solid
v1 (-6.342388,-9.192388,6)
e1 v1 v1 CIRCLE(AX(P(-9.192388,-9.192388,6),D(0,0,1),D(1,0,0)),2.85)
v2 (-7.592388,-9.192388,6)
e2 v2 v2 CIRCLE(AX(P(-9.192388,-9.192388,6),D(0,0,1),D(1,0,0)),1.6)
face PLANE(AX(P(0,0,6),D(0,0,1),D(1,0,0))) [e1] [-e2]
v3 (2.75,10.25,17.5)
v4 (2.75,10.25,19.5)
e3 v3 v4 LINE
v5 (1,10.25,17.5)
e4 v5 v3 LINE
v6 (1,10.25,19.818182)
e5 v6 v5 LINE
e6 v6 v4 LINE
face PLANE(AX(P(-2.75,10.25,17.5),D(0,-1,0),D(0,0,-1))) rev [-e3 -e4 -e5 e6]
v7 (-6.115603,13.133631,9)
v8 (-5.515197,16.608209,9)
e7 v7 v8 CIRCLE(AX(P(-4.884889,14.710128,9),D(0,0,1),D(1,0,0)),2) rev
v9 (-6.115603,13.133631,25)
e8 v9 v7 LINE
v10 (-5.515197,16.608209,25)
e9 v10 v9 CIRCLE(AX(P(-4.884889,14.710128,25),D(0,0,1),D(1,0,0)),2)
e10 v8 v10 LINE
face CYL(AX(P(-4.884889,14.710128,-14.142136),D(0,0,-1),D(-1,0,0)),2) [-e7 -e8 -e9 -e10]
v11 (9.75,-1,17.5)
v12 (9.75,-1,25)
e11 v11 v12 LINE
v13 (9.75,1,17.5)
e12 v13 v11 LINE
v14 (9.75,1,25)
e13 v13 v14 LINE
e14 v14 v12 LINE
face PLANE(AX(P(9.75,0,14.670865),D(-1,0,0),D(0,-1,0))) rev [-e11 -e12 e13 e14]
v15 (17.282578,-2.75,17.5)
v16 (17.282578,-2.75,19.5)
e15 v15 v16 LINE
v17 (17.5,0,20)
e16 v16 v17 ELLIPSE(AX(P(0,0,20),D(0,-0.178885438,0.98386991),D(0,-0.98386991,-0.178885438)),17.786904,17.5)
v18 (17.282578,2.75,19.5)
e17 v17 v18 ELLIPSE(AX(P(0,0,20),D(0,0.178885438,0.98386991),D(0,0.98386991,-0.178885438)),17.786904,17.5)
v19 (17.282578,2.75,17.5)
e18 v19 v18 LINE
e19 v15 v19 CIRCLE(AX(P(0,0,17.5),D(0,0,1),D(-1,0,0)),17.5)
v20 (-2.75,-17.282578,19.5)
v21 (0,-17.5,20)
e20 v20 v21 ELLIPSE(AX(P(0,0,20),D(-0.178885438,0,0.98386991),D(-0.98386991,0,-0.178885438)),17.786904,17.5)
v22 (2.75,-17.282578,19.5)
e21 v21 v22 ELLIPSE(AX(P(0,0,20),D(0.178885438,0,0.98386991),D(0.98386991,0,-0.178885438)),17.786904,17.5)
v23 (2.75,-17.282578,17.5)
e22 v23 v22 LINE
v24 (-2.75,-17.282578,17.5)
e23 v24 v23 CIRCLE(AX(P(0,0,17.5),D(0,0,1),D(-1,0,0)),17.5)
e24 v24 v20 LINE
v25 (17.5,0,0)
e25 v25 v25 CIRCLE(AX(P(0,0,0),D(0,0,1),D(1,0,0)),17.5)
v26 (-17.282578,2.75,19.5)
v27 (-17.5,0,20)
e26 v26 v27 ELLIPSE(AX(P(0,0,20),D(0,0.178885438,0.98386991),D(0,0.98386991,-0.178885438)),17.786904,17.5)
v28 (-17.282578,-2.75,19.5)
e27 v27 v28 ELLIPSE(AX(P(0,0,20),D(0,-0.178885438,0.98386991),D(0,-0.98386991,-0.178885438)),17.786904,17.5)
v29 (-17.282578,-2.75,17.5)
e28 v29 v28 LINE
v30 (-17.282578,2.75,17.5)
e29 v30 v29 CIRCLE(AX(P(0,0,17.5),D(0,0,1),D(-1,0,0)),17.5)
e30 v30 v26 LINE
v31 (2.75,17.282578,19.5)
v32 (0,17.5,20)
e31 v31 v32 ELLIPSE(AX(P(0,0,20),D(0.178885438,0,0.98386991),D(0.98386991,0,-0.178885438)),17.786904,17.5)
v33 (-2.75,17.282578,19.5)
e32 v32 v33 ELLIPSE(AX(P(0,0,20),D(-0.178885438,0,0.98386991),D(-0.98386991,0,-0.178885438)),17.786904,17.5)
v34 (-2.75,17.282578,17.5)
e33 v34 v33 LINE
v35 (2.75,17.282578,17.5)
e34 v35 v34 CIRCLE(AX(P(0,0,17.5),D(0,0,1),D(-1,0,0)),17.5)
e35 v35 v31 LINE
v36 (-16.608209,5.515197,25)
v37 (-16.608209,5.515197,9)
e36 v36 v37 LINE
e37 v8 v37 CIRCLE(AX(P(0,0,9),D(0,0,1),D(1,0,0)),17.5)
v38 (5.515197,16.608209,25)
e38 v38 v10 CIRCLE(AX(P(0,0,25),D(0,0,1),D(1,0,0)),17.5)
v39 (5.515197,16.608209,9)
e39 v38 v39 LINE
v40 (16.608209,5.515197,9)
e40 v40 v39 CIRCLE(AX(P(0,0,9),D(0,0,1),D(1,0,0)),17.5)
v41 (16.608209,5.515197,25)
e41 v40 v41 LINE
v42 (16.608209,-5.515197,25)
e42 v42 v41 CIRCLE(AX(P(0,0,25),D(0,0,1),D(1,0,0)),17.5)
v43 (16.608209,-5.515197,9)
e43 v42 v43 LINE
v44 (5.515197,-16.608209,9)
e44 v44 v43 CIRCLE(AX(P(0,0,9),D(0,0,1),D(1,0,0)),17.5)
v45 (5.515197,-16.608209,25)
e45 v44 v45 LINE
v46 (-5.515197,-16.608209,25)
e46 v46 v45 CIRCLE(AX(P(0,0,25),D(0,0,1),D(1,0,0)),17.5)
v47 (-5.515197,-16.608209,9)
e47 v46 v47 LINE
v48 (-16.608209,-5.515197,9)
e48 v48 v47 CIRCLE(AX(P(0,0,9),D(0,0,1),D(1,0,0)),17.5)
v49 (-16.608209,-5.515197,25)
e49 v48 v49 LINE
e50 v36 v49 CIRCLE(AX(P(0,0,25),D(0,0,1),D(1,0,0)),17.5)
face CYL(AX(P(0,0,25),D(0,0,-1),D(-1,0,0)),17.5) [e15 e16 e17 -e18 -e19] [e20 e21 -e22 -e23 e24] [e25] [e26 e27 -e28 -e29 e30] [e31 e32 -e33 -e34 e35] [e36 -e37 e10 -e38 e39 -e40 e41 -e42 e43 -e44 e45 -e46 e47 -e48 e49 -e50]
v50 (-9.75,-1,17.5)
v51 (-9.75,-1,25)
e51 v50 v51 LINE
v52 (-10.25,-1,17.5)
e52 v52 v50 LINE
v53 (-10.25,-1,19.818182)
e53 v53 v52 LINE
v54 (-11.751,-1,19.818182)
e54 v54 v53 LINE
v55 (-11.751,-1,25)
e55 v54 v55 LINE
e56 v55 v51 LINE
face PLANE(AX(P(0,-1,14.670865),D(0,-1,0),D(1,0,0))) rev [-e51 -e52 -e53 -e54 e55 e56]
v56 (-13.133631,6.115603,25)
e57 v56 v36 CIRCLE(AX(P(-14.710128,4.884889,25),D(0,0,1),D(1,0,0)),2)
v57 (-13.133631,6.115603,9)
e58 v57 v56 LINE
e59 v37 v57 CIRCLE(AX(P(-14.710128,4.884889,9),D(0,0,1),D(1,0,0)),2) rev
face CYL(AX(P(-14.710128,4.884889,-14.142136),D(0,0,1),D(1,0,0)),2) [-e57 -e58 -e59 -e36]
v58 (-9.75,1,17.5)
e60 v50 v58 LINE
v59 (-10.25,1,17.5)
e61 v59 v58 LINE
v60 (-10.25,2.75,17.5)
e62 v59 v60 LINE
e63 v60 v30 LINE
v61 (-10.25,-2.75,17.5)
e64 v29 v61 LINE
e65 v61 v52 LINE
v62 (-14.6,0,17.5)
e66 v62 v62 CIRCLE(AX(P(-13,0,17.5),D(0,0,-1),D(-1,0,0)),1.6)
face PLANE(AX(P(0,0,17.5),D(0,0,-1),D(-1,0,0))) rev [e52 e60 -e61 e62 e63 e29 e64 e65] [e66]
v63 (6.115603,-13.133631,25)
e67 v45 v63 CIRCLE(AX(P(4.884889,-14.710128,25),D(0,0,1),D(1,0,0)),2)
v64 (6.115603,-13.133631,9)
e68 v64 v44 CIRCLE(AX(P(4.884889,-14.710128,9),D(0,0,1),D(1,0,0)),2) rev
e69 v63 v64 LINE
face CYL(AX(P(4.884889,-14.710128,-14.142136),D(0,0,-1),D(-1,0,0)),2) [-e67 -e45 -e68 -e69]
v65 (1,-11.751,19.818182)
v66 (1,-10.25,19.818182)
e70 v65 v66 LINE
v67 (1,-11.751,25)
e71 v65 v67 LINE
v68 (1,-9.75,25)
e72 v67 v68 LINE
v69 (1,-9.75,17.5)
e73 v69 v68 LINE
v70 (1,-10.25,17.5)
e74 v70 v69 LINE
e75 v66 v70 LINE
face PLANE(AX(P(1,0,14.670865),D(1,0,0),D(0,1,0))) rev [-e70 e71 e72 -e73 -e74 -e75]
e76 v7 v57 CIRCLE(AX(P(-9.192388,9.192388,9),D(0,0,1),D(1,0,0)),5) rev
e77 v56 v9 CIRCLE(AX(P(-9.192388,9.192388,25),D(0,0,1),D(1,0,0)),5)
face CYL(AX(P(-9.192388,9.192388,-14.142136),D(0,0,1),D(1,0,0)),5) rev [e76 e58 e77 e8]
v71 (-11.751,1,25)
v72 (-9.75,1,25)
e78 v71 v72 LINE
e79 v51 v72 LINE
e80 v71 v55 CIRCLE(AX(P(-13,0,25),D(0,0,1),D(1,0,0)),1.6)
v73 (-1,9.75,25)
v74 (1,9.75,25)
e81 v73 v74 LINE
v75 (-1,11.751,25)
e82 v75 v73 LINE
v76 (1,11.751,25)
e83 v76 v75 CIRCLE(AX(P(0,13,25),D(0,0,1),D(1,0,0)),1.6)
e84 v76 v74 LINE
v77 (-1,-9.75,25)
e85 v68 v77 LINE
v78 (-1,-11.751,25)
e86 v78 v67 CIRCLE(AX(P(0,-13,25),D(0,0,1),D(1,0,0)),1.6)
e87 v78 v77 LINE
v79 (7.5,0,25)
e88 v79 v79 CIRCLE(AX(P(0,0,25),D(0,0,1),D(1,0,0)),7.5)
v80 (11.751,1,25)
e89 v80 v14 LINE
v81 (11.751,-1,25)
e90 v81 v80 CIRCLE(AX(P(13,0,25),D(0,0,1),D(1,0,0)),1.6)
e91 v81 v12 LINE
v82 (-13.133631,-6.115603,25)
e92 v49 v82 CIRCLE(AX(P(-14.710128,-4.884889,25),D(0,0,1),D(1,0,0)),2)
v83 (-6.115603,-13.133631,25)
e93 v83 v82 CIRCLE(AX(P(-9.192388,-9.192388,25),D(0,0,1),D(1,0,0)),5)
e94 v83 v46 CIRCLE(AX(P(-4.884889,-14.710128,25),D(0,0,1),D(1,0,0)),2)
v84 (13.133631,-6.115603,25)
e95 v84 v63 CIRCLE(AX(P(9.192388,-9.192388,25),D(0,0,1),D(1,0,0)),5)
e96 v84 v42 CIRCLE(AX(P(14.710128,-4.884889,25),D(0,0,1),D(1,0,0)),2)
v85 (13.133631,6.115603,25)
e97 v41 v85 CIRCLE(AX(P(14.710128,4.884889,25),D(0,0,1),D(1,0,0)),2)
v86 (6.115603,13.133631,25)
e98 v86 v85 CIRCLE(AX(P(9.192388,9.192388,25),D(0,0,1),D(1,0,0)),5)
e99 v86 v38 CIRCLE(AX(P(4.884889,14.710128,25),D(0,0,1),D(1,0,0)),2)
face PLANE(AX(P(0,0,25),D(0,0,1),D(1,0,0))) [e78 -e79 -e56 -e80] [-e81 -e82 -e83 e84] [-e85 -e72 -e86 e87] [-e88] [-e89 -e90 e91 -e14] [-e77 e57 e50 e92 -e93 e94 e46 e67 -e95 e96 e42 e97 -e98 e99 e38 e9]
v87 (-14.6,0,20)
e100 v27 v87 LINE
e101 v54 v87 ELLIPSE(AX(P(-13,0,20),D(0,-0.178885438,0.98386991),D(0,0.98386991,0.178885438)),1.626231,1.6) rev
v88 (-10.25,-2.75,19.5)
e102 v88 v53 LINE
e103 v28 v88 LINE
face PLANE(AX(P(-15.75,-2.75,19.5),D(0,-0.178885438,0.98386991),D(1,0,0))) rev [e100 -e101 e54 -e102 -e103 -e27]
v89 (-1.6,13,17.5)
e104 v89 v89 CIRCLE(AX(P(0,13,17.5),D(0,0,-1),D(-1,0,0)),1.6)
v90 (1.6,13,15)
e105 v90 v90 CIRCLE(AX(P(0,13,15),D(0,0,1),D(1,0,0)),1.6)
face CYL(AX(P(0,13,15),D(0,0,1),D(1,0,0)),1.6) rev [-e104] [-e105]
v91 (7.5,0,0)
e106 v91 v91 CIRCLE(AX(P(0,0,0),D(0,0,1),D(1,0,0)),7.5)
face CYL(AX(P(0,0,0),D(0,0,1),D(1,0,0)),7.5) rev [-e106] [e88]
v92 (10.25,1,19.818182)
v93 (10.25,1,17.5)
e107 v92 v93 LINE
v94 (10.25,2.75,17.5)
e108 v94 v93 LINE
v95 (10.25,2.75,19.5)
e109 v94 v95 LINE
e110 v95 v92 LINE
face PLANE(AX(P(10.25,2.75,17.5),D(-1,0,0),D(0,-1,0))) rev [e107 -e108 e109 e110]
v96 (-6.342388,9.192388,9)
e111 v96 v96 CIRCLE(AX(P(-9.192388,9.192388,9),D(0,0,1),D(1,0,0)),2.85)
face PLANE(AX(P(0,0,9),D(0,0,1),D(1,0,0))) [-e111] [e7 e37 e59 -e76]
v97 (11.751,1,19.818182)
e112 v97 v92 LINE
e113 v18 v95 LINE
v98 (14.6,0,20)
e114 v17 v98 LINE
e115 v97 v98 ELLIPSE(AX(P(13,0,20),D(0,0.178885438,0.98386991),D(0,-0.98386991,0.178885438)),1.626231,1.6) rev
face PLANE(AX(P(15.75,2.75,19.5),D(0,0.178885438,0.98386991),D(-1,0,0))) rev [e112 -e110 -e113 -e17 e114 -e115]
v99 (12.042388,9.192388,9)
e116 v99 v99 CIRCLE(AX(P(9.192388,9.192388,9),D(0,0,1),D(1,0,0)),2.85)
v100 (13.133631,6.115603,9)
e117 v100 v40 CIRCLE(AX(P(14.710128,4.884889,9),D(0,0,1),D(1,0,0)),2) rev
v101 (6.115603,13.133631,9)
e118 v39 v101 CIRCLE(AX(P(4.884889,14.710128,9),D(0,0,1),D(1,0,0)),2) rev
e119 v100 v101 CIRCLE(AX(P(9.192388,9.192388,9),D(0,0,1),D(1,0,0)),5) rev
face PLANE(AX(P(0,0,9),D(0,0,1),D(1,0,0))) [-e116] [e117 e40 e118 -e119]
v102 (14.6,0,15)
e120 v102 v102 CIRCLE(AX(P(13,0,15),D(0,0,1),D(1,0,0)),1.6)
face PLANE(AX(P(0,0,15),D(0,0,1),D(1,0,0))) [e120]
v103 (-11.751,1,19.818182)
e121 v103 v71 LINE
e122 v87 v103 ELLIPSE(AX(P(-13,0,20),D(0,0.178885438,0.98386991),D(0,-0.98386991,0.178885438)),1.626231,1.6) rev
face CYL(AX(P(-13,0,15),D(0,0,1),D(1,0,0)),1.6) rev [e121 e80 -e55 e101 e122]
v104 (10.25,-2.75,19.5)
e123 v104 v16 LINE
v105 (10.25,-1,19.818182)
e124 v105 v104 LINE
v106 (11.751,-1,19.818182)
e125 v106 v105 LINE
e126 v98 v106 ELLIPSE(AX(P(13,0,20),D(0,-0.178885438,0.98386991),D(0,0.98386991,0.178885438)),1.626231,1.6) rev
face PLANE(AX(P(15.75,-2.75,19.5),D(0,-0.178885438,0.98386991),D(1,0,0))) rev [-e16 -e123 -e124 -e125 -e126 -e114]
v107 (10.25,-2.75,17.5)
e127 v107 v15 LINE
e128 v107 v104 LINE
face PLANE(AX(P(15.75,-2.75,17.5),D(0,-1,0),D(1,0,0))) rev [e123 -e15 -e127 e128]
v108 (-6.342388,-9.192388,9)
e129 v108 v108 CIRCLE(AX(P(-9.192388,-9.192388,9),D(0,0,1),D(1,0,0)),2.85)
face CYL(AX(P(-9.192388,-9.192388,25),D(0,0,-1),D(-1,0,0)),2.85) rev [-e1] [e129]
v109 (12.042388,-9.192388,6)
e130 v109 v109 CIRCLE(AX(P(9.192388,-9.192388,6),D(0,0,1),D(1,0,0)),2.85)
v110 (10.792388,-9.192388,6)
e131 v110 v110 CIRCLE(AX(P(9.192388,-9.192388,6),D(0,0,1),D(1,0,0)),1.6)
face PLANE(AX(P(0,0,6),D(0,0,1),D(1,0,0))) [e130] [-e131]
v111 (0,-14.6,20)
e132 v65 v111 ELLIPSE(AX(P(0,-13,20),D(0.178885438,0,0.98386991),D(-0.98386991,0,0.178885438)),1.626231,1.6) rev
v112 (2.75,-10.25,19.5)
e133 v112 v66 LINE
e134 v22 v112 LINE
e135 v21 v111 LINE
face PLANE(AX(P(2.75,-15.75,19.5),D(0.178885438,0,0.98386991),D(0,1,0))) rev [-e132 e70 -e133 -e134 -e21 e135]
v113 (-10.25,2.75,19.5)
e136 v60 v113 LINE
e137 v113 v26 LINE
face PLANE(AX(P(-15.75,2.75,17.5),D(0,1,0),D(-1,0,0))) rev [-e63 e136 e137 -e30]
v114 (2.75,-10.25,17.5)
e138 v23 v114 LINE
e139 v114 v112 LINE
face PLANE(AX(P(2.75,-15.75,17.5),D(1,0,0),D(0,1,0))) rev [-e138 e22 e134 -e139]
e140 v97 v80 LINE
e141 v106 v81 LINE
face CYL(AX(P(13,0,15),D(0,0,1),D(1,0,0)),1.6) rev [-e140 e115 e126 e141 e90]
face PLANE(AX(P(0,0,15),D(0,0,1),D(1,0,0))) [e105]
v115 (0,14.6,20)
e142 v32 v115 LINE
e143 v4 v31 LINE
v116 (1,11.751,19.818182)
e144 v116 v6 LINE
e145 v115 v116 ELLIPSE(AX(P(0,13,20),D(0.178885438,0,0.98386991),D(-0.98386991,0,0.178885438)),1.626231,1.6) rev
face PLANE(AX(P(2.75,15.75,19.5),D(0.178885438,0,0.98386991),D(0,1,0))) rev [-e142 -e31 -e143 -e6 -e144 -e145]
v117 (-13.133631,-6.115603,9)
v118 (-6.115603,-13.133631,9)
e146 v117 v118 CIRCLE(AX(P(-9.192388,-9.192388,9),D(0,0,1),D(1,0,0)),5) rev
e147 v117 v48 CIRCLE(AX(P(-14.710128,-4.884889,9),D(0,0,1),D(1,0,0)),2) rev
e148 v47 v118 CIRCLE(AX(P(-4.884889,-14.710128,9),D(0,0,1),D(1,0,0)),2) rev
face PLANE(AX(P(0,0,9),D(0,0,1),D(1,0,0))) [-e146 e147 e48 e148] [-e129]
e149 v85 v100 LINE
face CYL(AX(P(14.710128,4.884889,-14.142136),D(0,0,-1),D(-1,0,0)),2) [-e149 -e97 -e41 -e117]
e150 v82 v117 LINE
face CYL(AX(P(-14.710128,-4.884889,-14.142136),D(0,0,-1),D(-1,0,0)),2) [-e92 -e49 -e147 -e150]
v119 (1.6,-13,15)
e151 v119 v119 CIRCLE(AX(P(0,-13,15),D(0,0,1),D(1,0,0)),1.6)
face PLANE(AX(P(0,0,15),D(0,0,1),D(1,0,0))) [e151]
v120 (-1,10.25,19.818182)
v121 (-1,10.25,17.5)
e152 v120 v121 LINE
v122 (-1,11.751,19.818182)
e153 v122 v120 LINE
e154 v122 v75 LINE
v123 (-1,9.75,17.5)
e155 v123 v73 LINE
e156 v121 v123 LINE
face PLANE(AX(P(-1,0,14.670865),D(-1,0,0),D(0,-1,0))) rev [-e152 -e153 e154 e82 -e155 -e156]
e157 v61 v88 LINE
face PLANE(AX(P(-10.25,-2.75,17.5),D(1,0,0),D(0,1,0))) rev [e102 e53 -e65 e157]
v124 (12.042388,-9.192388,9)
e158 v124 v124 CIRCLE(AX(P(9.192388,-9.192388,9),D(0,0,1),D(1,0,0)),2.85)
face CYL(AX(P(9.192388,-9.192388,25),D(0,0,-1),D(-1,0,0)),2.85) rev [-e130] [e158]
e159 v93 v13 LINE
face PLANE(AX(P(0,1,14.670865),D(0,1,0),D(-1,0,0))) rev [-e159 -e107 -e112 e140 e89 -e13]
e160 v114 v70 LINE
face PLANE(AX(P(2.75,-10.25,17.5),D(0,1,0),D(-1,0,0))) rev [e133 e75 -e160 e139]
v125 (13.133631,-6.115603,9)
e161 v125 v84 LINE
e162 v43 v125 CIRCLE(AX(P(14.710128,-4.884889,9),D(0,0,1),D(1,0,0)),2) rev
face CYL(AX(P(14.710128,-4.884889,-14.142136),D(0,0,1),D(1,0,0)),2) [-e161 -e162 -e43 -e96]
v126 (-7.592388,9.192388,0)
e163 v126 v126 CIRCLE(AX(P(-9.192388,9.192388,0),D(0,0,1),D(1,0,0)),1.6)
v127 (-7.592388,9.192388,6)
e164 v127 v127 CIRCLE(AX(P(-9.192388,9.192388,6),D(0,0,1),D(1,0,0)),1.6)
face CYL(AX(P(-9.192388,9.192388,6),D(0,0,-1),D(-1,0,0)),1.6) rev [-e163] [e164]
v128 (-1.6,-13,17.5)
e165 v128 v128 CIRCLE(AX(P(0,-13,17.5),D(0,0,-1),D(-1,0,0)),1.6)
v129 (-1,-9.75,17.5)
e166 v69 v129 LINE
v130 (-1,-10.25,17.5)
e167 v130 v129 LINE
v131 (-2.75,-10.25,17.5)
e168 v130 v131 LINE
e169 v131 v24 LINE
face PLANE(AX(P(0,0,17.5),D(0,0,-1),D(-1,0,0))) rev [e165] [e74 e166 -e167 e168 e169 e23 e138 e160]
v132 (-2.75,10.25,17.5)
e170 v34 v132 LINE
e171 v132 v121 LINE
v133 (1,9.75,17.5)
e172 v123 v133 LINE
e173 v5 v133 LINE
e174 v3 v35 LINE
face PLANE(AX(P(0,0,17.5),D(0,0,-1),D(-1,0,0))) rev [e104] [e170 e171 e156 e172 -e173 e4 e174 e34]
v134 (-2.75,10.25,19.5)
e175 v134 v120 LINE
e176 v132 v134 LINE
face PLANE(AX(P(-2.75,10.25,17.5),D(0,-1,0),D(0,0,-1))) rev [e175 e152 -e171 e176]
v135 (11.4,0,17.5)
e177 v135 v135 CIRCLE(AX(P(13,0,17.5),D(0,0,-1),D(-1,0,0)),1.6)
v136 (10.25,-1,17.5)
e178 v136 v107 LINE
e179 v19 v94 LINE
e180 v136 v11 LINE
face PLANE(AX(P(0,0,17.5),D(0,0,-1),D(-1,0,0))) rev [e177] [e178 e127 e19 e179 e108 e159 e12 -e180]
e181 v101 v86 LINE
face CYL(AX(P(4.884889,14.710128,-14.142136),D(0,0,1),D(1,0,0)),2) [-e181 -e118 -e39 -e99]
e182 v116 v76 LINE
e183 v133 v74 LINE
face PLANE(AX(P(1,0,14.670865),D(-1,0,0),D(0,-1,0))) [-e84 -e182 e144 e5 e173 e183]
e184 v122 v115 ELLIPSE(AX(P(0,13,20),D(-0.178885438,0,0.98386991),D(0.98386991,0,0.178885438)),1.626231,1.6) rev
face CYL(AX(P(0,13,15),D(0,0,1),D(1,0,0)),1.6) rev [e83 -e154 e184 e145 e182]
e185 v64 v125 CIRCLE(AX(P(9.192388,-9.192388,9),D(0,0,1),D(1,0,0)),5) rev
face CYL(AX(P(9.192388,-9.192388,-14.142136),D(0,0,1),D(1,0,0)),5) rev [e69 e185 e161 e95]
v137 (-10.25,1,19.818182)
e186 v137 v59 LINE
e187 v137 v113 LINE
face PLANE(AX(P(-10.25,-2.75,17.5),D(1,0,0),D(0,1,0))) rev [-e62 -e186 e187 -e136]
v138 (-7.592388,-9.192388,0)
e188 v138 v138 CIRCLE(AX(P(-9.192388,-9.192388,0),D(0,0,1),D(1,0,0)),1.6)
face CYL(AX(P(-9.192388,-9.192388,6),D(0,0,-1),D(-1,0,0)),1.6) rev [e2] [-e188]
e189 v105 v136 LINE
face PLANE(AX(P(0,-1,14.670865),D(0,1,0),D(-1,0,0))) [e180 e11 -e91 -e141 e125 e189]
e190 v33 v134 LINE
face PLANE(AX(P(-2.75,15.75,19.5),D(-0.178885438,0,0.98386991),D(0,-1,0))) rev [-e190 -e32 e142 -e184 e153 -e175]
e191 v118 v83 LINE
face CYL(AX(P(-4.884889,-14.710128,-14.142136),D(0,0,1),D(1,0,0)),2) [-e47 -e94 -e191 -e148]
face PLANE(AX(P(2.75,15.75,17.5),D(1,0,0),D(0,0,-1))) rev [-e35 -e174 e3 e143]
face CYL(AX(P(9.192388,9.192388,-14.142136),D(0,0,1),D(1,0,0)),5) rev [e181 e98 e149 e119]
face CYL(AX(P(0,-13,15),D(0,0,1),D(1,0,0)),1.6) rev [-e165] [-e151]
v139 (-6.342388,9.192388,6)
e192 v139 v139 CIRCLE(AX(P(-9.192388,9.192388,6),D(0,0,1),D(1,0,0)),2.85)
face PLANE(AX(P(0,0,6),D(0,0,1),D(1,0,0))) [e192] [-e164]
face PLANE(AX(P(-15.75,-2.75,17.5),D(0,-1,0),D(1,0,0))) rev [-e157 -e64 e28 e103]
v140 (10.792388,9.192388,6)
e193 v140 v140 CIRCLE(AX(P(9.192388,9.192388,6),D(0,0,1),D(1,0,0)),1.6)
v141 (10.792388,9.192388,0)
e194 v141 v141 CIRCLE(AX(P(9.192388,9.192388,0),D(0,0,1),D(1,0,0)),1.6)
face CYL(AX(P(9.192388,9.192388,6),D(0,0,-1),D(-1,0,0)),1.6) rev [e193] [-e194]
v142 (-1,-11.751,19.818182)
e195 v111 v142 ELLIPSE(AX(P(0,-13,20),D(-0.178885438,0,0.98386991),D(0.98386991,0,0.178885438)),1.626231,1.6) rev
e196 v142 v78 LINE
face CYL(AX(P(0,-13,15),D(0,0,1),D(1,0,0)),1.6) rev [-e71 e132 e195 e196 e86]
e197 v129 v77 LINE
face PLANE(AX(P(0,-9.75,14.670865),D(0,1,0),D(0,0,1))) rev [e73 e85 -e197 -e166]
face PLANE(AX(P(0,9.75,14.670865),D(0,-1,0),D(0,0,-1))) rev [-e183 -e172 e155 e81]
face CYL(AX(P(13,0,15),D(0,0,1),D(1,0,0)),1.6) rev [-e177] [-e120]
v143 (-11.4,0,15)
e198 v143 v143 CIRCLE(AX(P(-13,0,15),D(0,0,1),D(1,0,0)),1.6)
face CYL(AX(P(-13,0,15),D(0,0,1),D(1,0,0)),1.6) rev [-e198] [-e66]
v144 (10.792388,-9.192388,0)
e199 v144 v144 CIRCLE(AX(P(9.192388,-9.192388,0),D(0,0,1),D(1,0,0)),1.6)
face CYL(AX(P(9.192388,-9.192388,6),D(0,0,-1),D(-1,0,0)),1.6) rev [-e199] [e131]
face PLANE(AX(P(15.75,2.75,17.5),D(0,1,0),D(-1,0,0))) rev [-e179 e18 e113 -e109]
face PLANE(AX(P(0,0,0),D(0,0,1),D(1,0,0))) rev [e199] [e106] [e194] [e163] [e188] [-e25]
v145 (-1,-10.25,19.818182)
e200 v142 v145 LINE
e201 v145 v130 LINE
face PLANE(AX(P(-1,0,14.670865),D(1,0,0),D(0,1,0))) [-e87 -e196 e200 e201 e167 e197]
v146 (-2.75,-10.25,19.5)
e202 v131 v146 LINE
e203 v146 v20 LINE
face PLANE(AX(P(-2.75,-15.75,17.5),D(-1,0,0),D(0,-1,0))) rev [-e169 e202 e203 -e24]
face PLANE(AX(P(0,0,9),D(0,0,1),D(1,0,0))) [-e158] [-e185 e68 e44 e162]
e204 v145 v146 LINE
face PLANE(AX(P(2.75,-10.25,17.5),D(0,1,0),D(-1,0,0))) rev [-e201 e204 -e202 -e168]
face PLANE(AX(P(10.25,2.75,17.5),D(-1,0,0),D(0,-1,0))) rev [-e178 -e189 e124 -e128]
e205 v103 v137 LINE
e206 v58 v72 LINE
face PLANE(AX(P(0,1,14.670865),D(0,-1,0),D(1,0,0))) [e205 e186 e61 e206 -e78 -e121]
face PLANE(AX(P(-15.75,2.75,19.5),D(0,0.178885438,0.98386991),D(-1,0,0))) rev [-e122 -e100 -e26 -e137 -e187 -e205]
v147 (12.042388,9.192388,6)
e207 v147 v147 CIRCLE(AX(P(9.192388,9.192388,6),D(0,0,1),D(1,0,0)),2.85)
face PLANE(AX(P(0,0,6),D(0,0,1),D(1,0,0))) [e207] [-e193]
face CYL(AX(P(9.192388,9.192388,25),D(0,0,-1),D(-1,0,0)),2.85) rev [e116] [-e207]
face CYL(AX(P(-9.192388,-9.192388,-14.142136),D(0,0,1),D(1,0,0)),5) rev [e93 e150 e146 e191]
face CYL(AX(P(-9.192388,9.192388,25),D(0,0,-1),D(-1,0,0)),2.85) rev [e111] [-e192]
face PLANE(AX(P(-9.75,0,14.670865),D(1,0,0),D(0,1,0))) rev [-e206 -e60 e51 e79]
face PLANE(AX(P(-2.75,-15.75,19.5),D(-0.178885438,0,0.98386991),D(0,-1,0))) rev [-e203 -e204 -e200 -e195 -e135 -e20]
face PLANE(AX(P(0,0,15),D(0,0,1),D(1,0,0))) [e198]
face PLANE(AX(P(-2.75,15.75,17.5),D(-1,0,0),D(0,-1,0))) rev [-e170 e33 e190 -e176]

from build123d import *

# Parameters (mm, degrees)
SKETCH1_R           = 17.5
SKETCH1_R_2         = 2.85
BOSS_EXTRUDE1_DEPTH = 25
SKETCH1_3_R         = 2.85
SKETCH1_3_R_2       = 1.6
BOSS_EXTRUDE2_DEPTH = 6
SKETCH2_R           = 5
CUT_EXTRUDE1_DEPTH  = 16
FILLET1_R           = 2
CUT_EXTRUDE2_START  = -7.5
SKETCH3_R           = 1.6
CUT_EXTRUDE2_DEPTH  = 2.5
CUT_EXTRUDE3_START  = -10
SKETCH3_2_R         = 1.6
CUT_EXTRUDE3_DEPTH  = 10
CHAMFER1_SIZE       = 2.75
CHAMFER1_SIZE_2     = 0.5
SKETCH4_R           = 7.5
CUT_EXTRUDE4_DEPTH  = 36.178118369
CUT_EXTRUDE5_REACH  = 37.178
SKETCH5_W           = 2
SKETCH5_H           = 0.5
CIRPATTERN1_COUNT   = 4


with BuildPart() as part:
    # Sketch1 → Boss-Extrude1 (new body)
    with BuildSketch(Plane(origin=(0, 0, 0), x_dir=(0, 1, 0), z_dir=(0, 0, 1))):
        with Locations(Location((0, 0, 0), (0, 0, 270))):
            Circle(SKETCH1_R)
        with Locations(Location((-9.192388155, 9.192388155, 0), (0, 0, 270))):
            Circle(SKETCH1_R_2, mode=Mode.SUBTRACT)
        with Locations(Location((-9.192388155, -9.192388155, 0), (0, 0, 270))):
            Circle(SKETCH1_R_2, mode=Mode.SUBTRACT)
        with Locations(Location((9.192388155, -9.192388155, 0), (0, 0, 270))):
            Circle(SKETCH1_R_2, mode=Mode.SUBTRACT)
        with Locations(Location((9.192388155, 9.192388155, 0), (0, 0, 270))):
            Circle(SKETCH1_R_2, mode=Mode.SUBTRACT)
    extrude(amount=BOSS_EXTRUDE1_DEPTH)

    # Sketch1<3> → Boss-Extrude2 (add)
    # profile 1 of 4: a face of its own
    with BuildSketch(Plane(origin=(0, 0, 0), x_dir=(0, 1, 0), z_dir=(0, 0, 1))):
        with Locations(Location((-9.192388155, -9.192388155, 0), (0, 0, 270))):
            Circle(SKETCH1_3_R)
        with Locations(Location((-9.192388155, -9.192388155, 0), (0, 0, 270))):
            Circle(SKETCH1_3_R_2, mode=Mode.SUBTRACT)
    # profile 2 of 4: a face of its own
    with BuildSketch(Plane(origin=(0, 0, 0), x_dir=(0, 1, 0), z_dir=(0, 0, 1))):
        with Locations(Location((-9.192388155, 9.192388155, 0), (0, 0, 270))):
            Circle(SKETCH1_3_R)
        with Locations(Location((-9.192388155, 9.192388155, 0), (0, 0, 270))):
            Circle(SKETCH1_3_R_2, mode=Mode.SUBTRACT)
    # profile 3 of 4: a face of its own
    with BuildSketch(Plane(origin=(0, 0, 0), x_dir=(0, 1, 0), z_dir=(0, 0, 1))):
        with Locations(Location((9.192388155, -9.192388155, 0), (0, 0, 270))):
            Circle(SKETCH1_3_R)
        with Locations(Location((9.192388155, -9.192388155, 0), (0, 0, 270))):
            Circle(SKETCH1_3_R_2, mode=Mode.SUBTRACT)
    # profile 4 of 4: a face of its own
    with BuildSketch(Plane(origin=(0, 0, 0), x_dir=(0, 1, 0), z_dir=(0, 0, 1))):
        with Locations(Location((9.192388155, 9.192388155, 0), (0, 0, 270))):
            Circle(SKETCH1_3_R)
        with Locations(Location((9.192388155, 9.192388155, 0), (0, 0, 270))):
            Circle(SKETCH1_3_R_2, mode=Mode.SUBTRACT)
    extrude(amount=BOSS_EXTRUDE2_DEPTH)

    # Sketch2 → Cut-Extrude1 (cut)
    with BuildSketch(Plane.XY.offset(25)):
        with Locations((-9.192388155, 9.192388155)):
            Circle(SKETCH2_R)
        with Locations((9.192388155, 9.192388155)):
            Circle(SKETCH2_R)
        with Locations((9.192388155, -9.192388155)):
            Circle(SKETCH2_R)
        with Locations((-9.192388155, -9.192388155)):
            Circle(SKETCH2_R)
    extrude(amount=-CUT_EXTRUDE1_DEPTH, mode=Mode.SUBTRACT)

    # Fillet1
    fillet1_edges = [part.edges().sort_by_distance(p)[0] for p in [
        (-14.028560913, -10.46181049, 17),
        (-10.46181049, -14.028560913, 17),
        (10.46181049, -14.028560913, 17),
        (14.028560913, -10.46181049, 17),
        (14.028560913, 10.46181049, 17),
        (10.46181049, 14.028560913, 17),
        (-10.46181049, 14.028560913, 17),
        (-14.028560913, 10.46181049, 17),
    ]]
    fillet(fillet1_edges, radius=FILLET1_R)

    # Sketch3 → Cut-Extrude2 (cut)
    # profile 1 of 4: a face of its own
    with BuildSketch(Plane.XY.offset(25).offset(CUT_EXTRUDE2_START)):
        with BuildLine():
            Line((-2.75, 15.75), (-2.75, 17.282577933))
            ThreePointArc((-2.75, 17.282577933), (0, 17.5), (2.75, 17.282577933))
            Line((2.75, 17.282577933), (2.75, 15.75))
            Line((2.75, 15.75), (2.75, 10.25))
            Line((2.75, 10.25), (-2.75, 10.25))
            Line((-2.75, 10.25), (-2.75, 15.75))
        make_face()
        with Locations((0, 13)):
            Circle(SKETCH3_R, mode=Mode.SUBTRACT)
    # profile 2 of 4: a face of its own
    with BuildSketch(Plane.XY.offset(25).offset(CUT_EXTRUDE2_START)):
        with BuildLine():
            Line((15.75, -2.75), (10.25, -2.75))
            Line((10.25, -2.75), (10.25, 2.75))
            Line((10.25, 2.75), (15.75, 2.75))
            Line((15.75, 2.75), (17.282577933, 2.75))
            ThreePointArc((17.282577933, 2.75), (17.5, 0), (17.282577933, -2.75))
            Line((17.282577933, -2.75), (15.75, -2.75))
        make_face()
        with Locations((13, 0)):
            Circle(SKETCH3_R, mode=Mode.SUBTRACT)
    # profile 3 of 4: a face of its own
    with BuildSketch(Plane.XY.offset(25).offset(CUT_EXTRUDE2_START)):
        with BuildLine():
            Line((-2.75, -15.75), (-2.75, -10.25))
            Line((-2.75, -10.25), (2.75, -10.25))
            Line((2.75, -10.25), (2.75, -15.75))
            Line((2.75, -15.75), (2.75, -17.282577933))
            ThreePointArc((2.75, -17.282577933), (0, -17.5), (-2.75, -17.282577933))
            Line((-2.75, -17.282577933), (-2.75, -15.75))
        make_face()
        with Locations((0, -13)):
            Circle(SKETCH3_R, mode=Mode.SUBTRACT)
    # profile 4 of 4: a face of its own
    with BuildSketch(Plane.XY.offset(25).offset(CUT_EXTRUDE2_START)):
        with BuildLine():
            Line((-15.75, 2.75), (-10.25, 2.75))
            Line((-10.25, 2.75), (-10.25, -2.75))
            Line((-10.25, -2.75), (-15.75, -2.75))
            Line((-15.75, -2.75), (-17.282577933, -2.75))
            ThreePointArc((-17.282577933, -2.75), (-17.5, 0), (-17.282577933, 2.75))
            Line((-17.282577933, 2.75), (-15.75, 2.75))
        make_face()
        with Locations((-13, 0)):
            Circle(SKETCH3_R, mode=Mode.SUBTRACT)
    extrude(amount=CUT_EXTRUDE2_DEPTH, mode=Mode.SUBTRACT)

    # Sketch3<2> → Cut-Extrude3 (cut)
    with BuildSketch(Plane.XY.offset(25).offset(CUT_EXTRUDE3_START)):
        with Locations((-13, 0)):
            Circle(SKETCH3_2_R)
        with Locations((0, 13)):
            Circle(SKETCH3_2_R)
        with Locations((13, 0)):
            Circle(SKETCH3_2_R)
        with Locations((0, -13)):
            Circle(SKETCH3_2_R)
    extrude(amount=CUT_EXTRUDE3_DEPTH, mode=Mode.SUBTRACT)

    # Chamfer1
    # the kernel refuses this chamfer: 2.75, 0.5 mm, written as the material it adds along each edge
    with BuildSketch(Plane(origin=(-3.104266441, -2.75, 20), x_dir=(1.0355932807417332e-14, 0.9999763028084744, 0.006884317068104265), z_dir=(-1, 0, 0))) as chamfer1_piece_1_section:
        Polygon((CHAMFER1_SIZE * 0.999976302808, CHAMFER1_SIZE * 0.0068843170681), (-CHAMFER1_SIZE_2 * 0.0068843170681, CHAMFER1_SIZE_2 * 0.999976302808), (0, 0), align=None)
    chamfer1_piece_1 = extrude(amount=21.324045051, mode=Mode.PRIVATE)
    chamfer1_piece_1 = chamfer1_piece_1 & Plane(origin=(0, 0, 19.863927103), x_dir=(1, 0, 0), z_dir=(0, 0, -1)) * Cylinder(17.5, 54, mode=Mode.PRIVATE)
    chamfer1_piece_1 = chamfer1_piece_1 - Plane(origin=(-13, 0, 19.863927103), x_dir=(1, 0, 0), z_dir=(0, 0, -1)) * Cylinder(1.6, 54, mode=Mode.PRIVATE)
    add(chamfer1_piece_1)
    with BuildSketch(Plane(origin=(-24.428311492, 2.75, 20), x_dir=(2.1371797081769355e-15, 0.20388124945923355, -0.9789956262001082), z_dir=(1, 0, 0))) as chamfer1_piece_2_section:
        Polygon((CHAMFER1_SIZE_2 * 0.9789956262, -CHAMFER1_SIZE_2 * 0.203881249459), (-CHAMFER1_SIZE * 0.203881249459, -CHAMFER1_SIZE * 0.9789956262), (0, 0), align=None)
    chamfer1_piece_2 = extrude(amount=21.324045051, mode=Mode.PRIVATE)
    chamfer1_piece_2 = chamfer1_piece_2 & Plane(origin=(0, 0, 19.852070676), x_dir=(1, 0, 0), z_dir=(0, 0, -1)) * Cylinder(17.5, 54, mode=Mode.PRIVATE)
    chamfer1_piece_2 = chamfer1_piece_2 - Plane(origin=(-13, 0, 19.852070676), x_dir=(1, 0, 0), z_dir=(0, 0, -1)) * Cylinder(1.6, 54, mode=Mode.PRIVATE)
    add(chamfer1_piece_2)
    with BuildSketch(Plane(origin=(-2.75, 3.104266441, 20), x_dir=(0.9999763028084744, 0, 0.006884317068104265), z_dir=(0, 1, 0))) as chamfer1_piece_3_section:
        Polygon((CHAMFER1_SIZE * 0.999976302808, CHAMFER1_SIZE * 0.0068843170681), (-CHAMFER1_SIZE_2 * 0.0068843170681, CHAMFER1_SIZE_2 * 0.999976302808), (0, 0), align=None)
    chamfer1_piece_3 = extrude(amount=21.324045051, mode=Mode.PRIVATE)
    chamfer1_piece_3 = chamfer1_piece_3 & Plane(origin=(0, 0, 19.863927103), x_dir=(1, 0, 0), z_dir=(0, 0, -1)) * Cylinder(17.5, 54, mode=Mode.PRIVATE)
    chamfer1_piece_3 = chamfer1_piece_3 - Plane(origin=(0, 13, 19.863927103), x_dir=(1, 0, 0), z_dir=(0, 0, -1)) * Cylinder(1.6, 54, mode=Mode.PRIVATE)
    add(chamfer1_piece_3)
    with BuildSketch(Plane(origin=(2.75, 24.428311492, 20), x_dir=(0.20388124945923355, 0, -0.9789956262001082), z_dir=(0, -1, 0))) as chamfer1_piece_4_section:
        Polygon((CHAMFER1_SIZE_2 * 0.9789956262, -CHAMFER1_SIZE_2 * 0.203881249459), (-CHAMFER1_SIZE * 0.203881249459, -CHAMFER1_SIZE * 0.9789956262), (0, 0), align=None)
    chamfer1_piece_4 = extrude(amount=21.324045051, mode=Mode.PRIVATE)
    chamfer1_piece_4 = chamfer1_piece_4 & Plane(origin=(0, 0, 19.852070749), x_dir=(1, 0, 0), z_dir=(0, 0, -1)) * Cylinder(17.5, 54, mode=Mode.PRIVATE)
    chamfer1_piece_4 = chamfer1_piece_4 - Plane(origin=(0, 13, 19.852070749), x_dir=(1, 0, 0), z_dir=(0, 0, -1)) * Cylinder(1.6, 54, mode=Mode.PRIVATE)
    add(chamfer1_piece_4)
    with BuildSketch(Plane(origin=(3.104266441, 2.75, 20), x_dir=(-3.409880314637416e-15, -0.9999763028084744, 0.006884317068104265), z_dir=(1, 0, 0))) as chamfer1_piece_5_section:
        Polygon((CHAMFER1_SIZE * 0.999976302808, CHAMFER1_SIZE * 0.0068843170681), (-CHAMFER1_SIZE_2 * 0.0068843170681, CHAMFER1_SIZE_2 * 0.999976302808), (0, 0), align=None)
    chamfer1_piece_5 = extrude(amount=21.324045051, mode=Mode.PRIVATE)
    chamfer1_piece_5 = chamfer1_piece_5 & Plane(origin=(0, 0, 19.863927103), x_dir=(1, 0, 0), z_dir=(0, 0, -1)) * Cylinder(17.5, 54, mode=Mode.PRIVATE)
    chamfer1_piece_5 = chamfer1_piece_5 - Plane(origin=(13, 0, 19.863927103), x_dir=(1, 0, 0), z_dir=(0, 0, -1)) * Cylinder(1.6, 54, mode=Mode.PRIVATE)
    add(chamfer1_piece_5)
    with BuildSketch(Plane(origin=(24.428311492, -2.75, 20), x_dir=(3.409880314637416e-15, 0.9999763028084744, 0.006884317068104265), z_dir=(-1, 0, 0))) as chamfer1_piece_6_section:
        Polygon((CHAMFER1_SIZE * 0.999976302808, CHAMFER1_SIZE * 0.0068843170681), (-CHAMFER1_SIZE_2 * 0.0068843170681, CHAMFER1_SIZE_2 * 0.999976302808), (0, 0), align=None)
    chamfer1_piece_6 = extrude(amount=21.324045051, mode=Mode.PRIVATE)
    chamfer1_piece_6 = chamfer1_piece_6 & Plane(origin=(0, 0, 19.852070366), x_dir=(1, 0, 0), z_dir=(0, 0, -1)) * Cylinder(17.5, 54, mode=Mode.PRIVATE)
    chamfer1_piece_6 = chamfer1_piece_6 - Plane(origin=(13, 0, 19.852070366), x_dir=(1, 0, 0), z_dir=(0, 0, -1)) * Cylinder(1.6, 54, mode=Mode.PRIVATE)
    add(chamfer1_piece_6)
    with BuildSketch(Plane(origin=(2.75, -3.104266441, 20), x_dir=(-0.9999763028084744, 6.88290656102737e-15, 0.006884317068104265), z_dir=(0, -1, 0))) as chamfer1_piece_7_section:
        Polygon((CHAMFER1_SIZE * 0.999976302808, CHAMFER1_SIZE * 0.0068843170681), (-CHAMFER1_SIZE_2 * 0.0068843170681, CHAMFER1_SIZE_2 * 0.999976302808), (0, 0), align=None)
    chamfer1_piece_7 = extrude(amount=21.324045051, mode=Mode.PRIVATE)
    chamfer1_piece_7 = chamfer1_piece_7 & Plane(origin=(0, 0, 19.863927103), x_dir=(1, 0, 0), z_dir=(0, 0, -1)) * Cylinder(17.5, 54, mode=Mode.PRIVATE)
    chamfer1_piece_7 = chamfer1_piece_7 - Plane(origin=(0, -13, 19.863927103), x_dir=(1, 0, 0), z_dir=(0, 0, -1)) * Cylinder(1.6, 54, mode=Mode.PRIVATE)
    add(chamfer1_piece_7)
    with BuildSketch(Plane(origin=(-2.75, -24.428311492, 20), x_dir=(-0.20388124945923355, 1.4290779976363847e-15, -0.9789956262001082), z_dir=(0, 1, 0))) as chamfer1_piece_8_section:
        Polygon((CHAMFER1_SIZE_2 * 0.9789956262, -CHAMFER1_SIZE_2 * 0.203881249459), (-CHAMFER1_SIZE * 0.203881249459, -CHAMFER1_SIZE * 0.9789956262), (0, 0), align=None)
    chamfer1_piece_8 = extrude(amount=21.324045051, mode=Mode.PRIVATE)
    chamfer1_piece_8 = chamfer1_piece_8 & Plane(origin=(0, 0, 19.852070422), x_dir=(1, 0, 0), z_dir=(0, 0, -1)) * Cylinder(17.5, 54, mode=Mode.PRIVATE)
    chamfer1_piece_8 = chamfer1_piece_8 - Plane(origin=(0, -13, 19.852070422), x_dir=(1, 0, 0), z_dir=(0, 0, -1)) * Cylinder(1.6, 54, mode=Mode.PRIVATE)
    add(chamfer1_piece_8)

    # Sketch4 → Cut-Extrude4 (cut, through all)
    with BuildSketch(Plane.XY.offset(25)):
        Circle(SKETCH4_R)
    extrude(amount=-CUT_EXTRUDE4_DEPTH, mode=Mode.SUBTRACT)

    # Cut-Extrude5: up to this face of the body (flat: up to its plane)
    cut_extrude5_end = Plane(part.part.faces().sort_by_distance((-2.658998626, 13.766288966, 17.5))[0])
    # Sketch5 → Cut-Extrude5 (cut, up to the picked face)
    with BuildSketch(Plane.XY.offset(25), mode=Mode.PRIVATE) as cut_extrude5_sk1:
        with Locations((0, 10)):
            Rectangle(SKETCH5_W, SKETCH5_H)
    cut_extrude5_tool1 = split(extrude(cut_extrude5_sk1.sketch, amount=-CUT_EXTRUDE5_REACH, mode=Mode.PRIVATE), bisect_by=cut_extrude5_end, keep=Keep.BOTH, mode=Mode.PRIVATE)
    # Sketch5 → Cut-Extrude5 (cut, up to the picked face)
    with BuildSketch(Plane.XY.offset(25), mode=Mode.PRIVATE) as cut_extrude5_sk2:
        with BuildLine():
            ThreePointArc((1, 11.7510004), (0, 11.4), (-1, 11.7510004))
            Line((-1, 11.7510004), (-1, 10.25))
            Line((-1, 10.25), (1, 10.25))
            Line((1, 10.25), (1, 11.7510004))
        make_face()
    cut_extrude5_tool2 = split(extrude(cut_extrude5_sk2.sketch, amount=-CUT_EXTRUDE5_REACH, mode=Mode.PRIVATE), bisect_by=cut_extrude5_end, keep=Keep.BOTH, mode=Mode.PRIVATE)
    cut_extrude5_1 = cut_extrude5_tool1.solids().sort_by(Axis((0, 10, 25), (0, 0, -1)))[0]
    add(cut_extrude5_1, mode=Mode.SUBTRACT)
    cut_extrude5_2 = cut_extrude5_tool2.solids().sort_by(Axis((0, 10.884842, 25), (0, 0, -1)))[0]
    add(cut_extrude5_2, mode=Mode.SUBTRACT)
    cut_extrude5 = cut_extrude5_1 + cut_extrude5_2  # Cut-Extrude5 as one shape, for the pattern or mirror that repeats it

    # CirPattern1: Cut-Extrude5 ×4 about axis
    cirpattern1_axis = Axis((0, 0, 0), (0, 0, 1))
    for i in range(1, CIRPATTERN1_COUNT):
        add(cut_extrude5.rotate(cirpattern1_axis, i * 360 / CIRPATTERN1_COUNT), mode=Mode.SUBTRACT)


solid = part.part
